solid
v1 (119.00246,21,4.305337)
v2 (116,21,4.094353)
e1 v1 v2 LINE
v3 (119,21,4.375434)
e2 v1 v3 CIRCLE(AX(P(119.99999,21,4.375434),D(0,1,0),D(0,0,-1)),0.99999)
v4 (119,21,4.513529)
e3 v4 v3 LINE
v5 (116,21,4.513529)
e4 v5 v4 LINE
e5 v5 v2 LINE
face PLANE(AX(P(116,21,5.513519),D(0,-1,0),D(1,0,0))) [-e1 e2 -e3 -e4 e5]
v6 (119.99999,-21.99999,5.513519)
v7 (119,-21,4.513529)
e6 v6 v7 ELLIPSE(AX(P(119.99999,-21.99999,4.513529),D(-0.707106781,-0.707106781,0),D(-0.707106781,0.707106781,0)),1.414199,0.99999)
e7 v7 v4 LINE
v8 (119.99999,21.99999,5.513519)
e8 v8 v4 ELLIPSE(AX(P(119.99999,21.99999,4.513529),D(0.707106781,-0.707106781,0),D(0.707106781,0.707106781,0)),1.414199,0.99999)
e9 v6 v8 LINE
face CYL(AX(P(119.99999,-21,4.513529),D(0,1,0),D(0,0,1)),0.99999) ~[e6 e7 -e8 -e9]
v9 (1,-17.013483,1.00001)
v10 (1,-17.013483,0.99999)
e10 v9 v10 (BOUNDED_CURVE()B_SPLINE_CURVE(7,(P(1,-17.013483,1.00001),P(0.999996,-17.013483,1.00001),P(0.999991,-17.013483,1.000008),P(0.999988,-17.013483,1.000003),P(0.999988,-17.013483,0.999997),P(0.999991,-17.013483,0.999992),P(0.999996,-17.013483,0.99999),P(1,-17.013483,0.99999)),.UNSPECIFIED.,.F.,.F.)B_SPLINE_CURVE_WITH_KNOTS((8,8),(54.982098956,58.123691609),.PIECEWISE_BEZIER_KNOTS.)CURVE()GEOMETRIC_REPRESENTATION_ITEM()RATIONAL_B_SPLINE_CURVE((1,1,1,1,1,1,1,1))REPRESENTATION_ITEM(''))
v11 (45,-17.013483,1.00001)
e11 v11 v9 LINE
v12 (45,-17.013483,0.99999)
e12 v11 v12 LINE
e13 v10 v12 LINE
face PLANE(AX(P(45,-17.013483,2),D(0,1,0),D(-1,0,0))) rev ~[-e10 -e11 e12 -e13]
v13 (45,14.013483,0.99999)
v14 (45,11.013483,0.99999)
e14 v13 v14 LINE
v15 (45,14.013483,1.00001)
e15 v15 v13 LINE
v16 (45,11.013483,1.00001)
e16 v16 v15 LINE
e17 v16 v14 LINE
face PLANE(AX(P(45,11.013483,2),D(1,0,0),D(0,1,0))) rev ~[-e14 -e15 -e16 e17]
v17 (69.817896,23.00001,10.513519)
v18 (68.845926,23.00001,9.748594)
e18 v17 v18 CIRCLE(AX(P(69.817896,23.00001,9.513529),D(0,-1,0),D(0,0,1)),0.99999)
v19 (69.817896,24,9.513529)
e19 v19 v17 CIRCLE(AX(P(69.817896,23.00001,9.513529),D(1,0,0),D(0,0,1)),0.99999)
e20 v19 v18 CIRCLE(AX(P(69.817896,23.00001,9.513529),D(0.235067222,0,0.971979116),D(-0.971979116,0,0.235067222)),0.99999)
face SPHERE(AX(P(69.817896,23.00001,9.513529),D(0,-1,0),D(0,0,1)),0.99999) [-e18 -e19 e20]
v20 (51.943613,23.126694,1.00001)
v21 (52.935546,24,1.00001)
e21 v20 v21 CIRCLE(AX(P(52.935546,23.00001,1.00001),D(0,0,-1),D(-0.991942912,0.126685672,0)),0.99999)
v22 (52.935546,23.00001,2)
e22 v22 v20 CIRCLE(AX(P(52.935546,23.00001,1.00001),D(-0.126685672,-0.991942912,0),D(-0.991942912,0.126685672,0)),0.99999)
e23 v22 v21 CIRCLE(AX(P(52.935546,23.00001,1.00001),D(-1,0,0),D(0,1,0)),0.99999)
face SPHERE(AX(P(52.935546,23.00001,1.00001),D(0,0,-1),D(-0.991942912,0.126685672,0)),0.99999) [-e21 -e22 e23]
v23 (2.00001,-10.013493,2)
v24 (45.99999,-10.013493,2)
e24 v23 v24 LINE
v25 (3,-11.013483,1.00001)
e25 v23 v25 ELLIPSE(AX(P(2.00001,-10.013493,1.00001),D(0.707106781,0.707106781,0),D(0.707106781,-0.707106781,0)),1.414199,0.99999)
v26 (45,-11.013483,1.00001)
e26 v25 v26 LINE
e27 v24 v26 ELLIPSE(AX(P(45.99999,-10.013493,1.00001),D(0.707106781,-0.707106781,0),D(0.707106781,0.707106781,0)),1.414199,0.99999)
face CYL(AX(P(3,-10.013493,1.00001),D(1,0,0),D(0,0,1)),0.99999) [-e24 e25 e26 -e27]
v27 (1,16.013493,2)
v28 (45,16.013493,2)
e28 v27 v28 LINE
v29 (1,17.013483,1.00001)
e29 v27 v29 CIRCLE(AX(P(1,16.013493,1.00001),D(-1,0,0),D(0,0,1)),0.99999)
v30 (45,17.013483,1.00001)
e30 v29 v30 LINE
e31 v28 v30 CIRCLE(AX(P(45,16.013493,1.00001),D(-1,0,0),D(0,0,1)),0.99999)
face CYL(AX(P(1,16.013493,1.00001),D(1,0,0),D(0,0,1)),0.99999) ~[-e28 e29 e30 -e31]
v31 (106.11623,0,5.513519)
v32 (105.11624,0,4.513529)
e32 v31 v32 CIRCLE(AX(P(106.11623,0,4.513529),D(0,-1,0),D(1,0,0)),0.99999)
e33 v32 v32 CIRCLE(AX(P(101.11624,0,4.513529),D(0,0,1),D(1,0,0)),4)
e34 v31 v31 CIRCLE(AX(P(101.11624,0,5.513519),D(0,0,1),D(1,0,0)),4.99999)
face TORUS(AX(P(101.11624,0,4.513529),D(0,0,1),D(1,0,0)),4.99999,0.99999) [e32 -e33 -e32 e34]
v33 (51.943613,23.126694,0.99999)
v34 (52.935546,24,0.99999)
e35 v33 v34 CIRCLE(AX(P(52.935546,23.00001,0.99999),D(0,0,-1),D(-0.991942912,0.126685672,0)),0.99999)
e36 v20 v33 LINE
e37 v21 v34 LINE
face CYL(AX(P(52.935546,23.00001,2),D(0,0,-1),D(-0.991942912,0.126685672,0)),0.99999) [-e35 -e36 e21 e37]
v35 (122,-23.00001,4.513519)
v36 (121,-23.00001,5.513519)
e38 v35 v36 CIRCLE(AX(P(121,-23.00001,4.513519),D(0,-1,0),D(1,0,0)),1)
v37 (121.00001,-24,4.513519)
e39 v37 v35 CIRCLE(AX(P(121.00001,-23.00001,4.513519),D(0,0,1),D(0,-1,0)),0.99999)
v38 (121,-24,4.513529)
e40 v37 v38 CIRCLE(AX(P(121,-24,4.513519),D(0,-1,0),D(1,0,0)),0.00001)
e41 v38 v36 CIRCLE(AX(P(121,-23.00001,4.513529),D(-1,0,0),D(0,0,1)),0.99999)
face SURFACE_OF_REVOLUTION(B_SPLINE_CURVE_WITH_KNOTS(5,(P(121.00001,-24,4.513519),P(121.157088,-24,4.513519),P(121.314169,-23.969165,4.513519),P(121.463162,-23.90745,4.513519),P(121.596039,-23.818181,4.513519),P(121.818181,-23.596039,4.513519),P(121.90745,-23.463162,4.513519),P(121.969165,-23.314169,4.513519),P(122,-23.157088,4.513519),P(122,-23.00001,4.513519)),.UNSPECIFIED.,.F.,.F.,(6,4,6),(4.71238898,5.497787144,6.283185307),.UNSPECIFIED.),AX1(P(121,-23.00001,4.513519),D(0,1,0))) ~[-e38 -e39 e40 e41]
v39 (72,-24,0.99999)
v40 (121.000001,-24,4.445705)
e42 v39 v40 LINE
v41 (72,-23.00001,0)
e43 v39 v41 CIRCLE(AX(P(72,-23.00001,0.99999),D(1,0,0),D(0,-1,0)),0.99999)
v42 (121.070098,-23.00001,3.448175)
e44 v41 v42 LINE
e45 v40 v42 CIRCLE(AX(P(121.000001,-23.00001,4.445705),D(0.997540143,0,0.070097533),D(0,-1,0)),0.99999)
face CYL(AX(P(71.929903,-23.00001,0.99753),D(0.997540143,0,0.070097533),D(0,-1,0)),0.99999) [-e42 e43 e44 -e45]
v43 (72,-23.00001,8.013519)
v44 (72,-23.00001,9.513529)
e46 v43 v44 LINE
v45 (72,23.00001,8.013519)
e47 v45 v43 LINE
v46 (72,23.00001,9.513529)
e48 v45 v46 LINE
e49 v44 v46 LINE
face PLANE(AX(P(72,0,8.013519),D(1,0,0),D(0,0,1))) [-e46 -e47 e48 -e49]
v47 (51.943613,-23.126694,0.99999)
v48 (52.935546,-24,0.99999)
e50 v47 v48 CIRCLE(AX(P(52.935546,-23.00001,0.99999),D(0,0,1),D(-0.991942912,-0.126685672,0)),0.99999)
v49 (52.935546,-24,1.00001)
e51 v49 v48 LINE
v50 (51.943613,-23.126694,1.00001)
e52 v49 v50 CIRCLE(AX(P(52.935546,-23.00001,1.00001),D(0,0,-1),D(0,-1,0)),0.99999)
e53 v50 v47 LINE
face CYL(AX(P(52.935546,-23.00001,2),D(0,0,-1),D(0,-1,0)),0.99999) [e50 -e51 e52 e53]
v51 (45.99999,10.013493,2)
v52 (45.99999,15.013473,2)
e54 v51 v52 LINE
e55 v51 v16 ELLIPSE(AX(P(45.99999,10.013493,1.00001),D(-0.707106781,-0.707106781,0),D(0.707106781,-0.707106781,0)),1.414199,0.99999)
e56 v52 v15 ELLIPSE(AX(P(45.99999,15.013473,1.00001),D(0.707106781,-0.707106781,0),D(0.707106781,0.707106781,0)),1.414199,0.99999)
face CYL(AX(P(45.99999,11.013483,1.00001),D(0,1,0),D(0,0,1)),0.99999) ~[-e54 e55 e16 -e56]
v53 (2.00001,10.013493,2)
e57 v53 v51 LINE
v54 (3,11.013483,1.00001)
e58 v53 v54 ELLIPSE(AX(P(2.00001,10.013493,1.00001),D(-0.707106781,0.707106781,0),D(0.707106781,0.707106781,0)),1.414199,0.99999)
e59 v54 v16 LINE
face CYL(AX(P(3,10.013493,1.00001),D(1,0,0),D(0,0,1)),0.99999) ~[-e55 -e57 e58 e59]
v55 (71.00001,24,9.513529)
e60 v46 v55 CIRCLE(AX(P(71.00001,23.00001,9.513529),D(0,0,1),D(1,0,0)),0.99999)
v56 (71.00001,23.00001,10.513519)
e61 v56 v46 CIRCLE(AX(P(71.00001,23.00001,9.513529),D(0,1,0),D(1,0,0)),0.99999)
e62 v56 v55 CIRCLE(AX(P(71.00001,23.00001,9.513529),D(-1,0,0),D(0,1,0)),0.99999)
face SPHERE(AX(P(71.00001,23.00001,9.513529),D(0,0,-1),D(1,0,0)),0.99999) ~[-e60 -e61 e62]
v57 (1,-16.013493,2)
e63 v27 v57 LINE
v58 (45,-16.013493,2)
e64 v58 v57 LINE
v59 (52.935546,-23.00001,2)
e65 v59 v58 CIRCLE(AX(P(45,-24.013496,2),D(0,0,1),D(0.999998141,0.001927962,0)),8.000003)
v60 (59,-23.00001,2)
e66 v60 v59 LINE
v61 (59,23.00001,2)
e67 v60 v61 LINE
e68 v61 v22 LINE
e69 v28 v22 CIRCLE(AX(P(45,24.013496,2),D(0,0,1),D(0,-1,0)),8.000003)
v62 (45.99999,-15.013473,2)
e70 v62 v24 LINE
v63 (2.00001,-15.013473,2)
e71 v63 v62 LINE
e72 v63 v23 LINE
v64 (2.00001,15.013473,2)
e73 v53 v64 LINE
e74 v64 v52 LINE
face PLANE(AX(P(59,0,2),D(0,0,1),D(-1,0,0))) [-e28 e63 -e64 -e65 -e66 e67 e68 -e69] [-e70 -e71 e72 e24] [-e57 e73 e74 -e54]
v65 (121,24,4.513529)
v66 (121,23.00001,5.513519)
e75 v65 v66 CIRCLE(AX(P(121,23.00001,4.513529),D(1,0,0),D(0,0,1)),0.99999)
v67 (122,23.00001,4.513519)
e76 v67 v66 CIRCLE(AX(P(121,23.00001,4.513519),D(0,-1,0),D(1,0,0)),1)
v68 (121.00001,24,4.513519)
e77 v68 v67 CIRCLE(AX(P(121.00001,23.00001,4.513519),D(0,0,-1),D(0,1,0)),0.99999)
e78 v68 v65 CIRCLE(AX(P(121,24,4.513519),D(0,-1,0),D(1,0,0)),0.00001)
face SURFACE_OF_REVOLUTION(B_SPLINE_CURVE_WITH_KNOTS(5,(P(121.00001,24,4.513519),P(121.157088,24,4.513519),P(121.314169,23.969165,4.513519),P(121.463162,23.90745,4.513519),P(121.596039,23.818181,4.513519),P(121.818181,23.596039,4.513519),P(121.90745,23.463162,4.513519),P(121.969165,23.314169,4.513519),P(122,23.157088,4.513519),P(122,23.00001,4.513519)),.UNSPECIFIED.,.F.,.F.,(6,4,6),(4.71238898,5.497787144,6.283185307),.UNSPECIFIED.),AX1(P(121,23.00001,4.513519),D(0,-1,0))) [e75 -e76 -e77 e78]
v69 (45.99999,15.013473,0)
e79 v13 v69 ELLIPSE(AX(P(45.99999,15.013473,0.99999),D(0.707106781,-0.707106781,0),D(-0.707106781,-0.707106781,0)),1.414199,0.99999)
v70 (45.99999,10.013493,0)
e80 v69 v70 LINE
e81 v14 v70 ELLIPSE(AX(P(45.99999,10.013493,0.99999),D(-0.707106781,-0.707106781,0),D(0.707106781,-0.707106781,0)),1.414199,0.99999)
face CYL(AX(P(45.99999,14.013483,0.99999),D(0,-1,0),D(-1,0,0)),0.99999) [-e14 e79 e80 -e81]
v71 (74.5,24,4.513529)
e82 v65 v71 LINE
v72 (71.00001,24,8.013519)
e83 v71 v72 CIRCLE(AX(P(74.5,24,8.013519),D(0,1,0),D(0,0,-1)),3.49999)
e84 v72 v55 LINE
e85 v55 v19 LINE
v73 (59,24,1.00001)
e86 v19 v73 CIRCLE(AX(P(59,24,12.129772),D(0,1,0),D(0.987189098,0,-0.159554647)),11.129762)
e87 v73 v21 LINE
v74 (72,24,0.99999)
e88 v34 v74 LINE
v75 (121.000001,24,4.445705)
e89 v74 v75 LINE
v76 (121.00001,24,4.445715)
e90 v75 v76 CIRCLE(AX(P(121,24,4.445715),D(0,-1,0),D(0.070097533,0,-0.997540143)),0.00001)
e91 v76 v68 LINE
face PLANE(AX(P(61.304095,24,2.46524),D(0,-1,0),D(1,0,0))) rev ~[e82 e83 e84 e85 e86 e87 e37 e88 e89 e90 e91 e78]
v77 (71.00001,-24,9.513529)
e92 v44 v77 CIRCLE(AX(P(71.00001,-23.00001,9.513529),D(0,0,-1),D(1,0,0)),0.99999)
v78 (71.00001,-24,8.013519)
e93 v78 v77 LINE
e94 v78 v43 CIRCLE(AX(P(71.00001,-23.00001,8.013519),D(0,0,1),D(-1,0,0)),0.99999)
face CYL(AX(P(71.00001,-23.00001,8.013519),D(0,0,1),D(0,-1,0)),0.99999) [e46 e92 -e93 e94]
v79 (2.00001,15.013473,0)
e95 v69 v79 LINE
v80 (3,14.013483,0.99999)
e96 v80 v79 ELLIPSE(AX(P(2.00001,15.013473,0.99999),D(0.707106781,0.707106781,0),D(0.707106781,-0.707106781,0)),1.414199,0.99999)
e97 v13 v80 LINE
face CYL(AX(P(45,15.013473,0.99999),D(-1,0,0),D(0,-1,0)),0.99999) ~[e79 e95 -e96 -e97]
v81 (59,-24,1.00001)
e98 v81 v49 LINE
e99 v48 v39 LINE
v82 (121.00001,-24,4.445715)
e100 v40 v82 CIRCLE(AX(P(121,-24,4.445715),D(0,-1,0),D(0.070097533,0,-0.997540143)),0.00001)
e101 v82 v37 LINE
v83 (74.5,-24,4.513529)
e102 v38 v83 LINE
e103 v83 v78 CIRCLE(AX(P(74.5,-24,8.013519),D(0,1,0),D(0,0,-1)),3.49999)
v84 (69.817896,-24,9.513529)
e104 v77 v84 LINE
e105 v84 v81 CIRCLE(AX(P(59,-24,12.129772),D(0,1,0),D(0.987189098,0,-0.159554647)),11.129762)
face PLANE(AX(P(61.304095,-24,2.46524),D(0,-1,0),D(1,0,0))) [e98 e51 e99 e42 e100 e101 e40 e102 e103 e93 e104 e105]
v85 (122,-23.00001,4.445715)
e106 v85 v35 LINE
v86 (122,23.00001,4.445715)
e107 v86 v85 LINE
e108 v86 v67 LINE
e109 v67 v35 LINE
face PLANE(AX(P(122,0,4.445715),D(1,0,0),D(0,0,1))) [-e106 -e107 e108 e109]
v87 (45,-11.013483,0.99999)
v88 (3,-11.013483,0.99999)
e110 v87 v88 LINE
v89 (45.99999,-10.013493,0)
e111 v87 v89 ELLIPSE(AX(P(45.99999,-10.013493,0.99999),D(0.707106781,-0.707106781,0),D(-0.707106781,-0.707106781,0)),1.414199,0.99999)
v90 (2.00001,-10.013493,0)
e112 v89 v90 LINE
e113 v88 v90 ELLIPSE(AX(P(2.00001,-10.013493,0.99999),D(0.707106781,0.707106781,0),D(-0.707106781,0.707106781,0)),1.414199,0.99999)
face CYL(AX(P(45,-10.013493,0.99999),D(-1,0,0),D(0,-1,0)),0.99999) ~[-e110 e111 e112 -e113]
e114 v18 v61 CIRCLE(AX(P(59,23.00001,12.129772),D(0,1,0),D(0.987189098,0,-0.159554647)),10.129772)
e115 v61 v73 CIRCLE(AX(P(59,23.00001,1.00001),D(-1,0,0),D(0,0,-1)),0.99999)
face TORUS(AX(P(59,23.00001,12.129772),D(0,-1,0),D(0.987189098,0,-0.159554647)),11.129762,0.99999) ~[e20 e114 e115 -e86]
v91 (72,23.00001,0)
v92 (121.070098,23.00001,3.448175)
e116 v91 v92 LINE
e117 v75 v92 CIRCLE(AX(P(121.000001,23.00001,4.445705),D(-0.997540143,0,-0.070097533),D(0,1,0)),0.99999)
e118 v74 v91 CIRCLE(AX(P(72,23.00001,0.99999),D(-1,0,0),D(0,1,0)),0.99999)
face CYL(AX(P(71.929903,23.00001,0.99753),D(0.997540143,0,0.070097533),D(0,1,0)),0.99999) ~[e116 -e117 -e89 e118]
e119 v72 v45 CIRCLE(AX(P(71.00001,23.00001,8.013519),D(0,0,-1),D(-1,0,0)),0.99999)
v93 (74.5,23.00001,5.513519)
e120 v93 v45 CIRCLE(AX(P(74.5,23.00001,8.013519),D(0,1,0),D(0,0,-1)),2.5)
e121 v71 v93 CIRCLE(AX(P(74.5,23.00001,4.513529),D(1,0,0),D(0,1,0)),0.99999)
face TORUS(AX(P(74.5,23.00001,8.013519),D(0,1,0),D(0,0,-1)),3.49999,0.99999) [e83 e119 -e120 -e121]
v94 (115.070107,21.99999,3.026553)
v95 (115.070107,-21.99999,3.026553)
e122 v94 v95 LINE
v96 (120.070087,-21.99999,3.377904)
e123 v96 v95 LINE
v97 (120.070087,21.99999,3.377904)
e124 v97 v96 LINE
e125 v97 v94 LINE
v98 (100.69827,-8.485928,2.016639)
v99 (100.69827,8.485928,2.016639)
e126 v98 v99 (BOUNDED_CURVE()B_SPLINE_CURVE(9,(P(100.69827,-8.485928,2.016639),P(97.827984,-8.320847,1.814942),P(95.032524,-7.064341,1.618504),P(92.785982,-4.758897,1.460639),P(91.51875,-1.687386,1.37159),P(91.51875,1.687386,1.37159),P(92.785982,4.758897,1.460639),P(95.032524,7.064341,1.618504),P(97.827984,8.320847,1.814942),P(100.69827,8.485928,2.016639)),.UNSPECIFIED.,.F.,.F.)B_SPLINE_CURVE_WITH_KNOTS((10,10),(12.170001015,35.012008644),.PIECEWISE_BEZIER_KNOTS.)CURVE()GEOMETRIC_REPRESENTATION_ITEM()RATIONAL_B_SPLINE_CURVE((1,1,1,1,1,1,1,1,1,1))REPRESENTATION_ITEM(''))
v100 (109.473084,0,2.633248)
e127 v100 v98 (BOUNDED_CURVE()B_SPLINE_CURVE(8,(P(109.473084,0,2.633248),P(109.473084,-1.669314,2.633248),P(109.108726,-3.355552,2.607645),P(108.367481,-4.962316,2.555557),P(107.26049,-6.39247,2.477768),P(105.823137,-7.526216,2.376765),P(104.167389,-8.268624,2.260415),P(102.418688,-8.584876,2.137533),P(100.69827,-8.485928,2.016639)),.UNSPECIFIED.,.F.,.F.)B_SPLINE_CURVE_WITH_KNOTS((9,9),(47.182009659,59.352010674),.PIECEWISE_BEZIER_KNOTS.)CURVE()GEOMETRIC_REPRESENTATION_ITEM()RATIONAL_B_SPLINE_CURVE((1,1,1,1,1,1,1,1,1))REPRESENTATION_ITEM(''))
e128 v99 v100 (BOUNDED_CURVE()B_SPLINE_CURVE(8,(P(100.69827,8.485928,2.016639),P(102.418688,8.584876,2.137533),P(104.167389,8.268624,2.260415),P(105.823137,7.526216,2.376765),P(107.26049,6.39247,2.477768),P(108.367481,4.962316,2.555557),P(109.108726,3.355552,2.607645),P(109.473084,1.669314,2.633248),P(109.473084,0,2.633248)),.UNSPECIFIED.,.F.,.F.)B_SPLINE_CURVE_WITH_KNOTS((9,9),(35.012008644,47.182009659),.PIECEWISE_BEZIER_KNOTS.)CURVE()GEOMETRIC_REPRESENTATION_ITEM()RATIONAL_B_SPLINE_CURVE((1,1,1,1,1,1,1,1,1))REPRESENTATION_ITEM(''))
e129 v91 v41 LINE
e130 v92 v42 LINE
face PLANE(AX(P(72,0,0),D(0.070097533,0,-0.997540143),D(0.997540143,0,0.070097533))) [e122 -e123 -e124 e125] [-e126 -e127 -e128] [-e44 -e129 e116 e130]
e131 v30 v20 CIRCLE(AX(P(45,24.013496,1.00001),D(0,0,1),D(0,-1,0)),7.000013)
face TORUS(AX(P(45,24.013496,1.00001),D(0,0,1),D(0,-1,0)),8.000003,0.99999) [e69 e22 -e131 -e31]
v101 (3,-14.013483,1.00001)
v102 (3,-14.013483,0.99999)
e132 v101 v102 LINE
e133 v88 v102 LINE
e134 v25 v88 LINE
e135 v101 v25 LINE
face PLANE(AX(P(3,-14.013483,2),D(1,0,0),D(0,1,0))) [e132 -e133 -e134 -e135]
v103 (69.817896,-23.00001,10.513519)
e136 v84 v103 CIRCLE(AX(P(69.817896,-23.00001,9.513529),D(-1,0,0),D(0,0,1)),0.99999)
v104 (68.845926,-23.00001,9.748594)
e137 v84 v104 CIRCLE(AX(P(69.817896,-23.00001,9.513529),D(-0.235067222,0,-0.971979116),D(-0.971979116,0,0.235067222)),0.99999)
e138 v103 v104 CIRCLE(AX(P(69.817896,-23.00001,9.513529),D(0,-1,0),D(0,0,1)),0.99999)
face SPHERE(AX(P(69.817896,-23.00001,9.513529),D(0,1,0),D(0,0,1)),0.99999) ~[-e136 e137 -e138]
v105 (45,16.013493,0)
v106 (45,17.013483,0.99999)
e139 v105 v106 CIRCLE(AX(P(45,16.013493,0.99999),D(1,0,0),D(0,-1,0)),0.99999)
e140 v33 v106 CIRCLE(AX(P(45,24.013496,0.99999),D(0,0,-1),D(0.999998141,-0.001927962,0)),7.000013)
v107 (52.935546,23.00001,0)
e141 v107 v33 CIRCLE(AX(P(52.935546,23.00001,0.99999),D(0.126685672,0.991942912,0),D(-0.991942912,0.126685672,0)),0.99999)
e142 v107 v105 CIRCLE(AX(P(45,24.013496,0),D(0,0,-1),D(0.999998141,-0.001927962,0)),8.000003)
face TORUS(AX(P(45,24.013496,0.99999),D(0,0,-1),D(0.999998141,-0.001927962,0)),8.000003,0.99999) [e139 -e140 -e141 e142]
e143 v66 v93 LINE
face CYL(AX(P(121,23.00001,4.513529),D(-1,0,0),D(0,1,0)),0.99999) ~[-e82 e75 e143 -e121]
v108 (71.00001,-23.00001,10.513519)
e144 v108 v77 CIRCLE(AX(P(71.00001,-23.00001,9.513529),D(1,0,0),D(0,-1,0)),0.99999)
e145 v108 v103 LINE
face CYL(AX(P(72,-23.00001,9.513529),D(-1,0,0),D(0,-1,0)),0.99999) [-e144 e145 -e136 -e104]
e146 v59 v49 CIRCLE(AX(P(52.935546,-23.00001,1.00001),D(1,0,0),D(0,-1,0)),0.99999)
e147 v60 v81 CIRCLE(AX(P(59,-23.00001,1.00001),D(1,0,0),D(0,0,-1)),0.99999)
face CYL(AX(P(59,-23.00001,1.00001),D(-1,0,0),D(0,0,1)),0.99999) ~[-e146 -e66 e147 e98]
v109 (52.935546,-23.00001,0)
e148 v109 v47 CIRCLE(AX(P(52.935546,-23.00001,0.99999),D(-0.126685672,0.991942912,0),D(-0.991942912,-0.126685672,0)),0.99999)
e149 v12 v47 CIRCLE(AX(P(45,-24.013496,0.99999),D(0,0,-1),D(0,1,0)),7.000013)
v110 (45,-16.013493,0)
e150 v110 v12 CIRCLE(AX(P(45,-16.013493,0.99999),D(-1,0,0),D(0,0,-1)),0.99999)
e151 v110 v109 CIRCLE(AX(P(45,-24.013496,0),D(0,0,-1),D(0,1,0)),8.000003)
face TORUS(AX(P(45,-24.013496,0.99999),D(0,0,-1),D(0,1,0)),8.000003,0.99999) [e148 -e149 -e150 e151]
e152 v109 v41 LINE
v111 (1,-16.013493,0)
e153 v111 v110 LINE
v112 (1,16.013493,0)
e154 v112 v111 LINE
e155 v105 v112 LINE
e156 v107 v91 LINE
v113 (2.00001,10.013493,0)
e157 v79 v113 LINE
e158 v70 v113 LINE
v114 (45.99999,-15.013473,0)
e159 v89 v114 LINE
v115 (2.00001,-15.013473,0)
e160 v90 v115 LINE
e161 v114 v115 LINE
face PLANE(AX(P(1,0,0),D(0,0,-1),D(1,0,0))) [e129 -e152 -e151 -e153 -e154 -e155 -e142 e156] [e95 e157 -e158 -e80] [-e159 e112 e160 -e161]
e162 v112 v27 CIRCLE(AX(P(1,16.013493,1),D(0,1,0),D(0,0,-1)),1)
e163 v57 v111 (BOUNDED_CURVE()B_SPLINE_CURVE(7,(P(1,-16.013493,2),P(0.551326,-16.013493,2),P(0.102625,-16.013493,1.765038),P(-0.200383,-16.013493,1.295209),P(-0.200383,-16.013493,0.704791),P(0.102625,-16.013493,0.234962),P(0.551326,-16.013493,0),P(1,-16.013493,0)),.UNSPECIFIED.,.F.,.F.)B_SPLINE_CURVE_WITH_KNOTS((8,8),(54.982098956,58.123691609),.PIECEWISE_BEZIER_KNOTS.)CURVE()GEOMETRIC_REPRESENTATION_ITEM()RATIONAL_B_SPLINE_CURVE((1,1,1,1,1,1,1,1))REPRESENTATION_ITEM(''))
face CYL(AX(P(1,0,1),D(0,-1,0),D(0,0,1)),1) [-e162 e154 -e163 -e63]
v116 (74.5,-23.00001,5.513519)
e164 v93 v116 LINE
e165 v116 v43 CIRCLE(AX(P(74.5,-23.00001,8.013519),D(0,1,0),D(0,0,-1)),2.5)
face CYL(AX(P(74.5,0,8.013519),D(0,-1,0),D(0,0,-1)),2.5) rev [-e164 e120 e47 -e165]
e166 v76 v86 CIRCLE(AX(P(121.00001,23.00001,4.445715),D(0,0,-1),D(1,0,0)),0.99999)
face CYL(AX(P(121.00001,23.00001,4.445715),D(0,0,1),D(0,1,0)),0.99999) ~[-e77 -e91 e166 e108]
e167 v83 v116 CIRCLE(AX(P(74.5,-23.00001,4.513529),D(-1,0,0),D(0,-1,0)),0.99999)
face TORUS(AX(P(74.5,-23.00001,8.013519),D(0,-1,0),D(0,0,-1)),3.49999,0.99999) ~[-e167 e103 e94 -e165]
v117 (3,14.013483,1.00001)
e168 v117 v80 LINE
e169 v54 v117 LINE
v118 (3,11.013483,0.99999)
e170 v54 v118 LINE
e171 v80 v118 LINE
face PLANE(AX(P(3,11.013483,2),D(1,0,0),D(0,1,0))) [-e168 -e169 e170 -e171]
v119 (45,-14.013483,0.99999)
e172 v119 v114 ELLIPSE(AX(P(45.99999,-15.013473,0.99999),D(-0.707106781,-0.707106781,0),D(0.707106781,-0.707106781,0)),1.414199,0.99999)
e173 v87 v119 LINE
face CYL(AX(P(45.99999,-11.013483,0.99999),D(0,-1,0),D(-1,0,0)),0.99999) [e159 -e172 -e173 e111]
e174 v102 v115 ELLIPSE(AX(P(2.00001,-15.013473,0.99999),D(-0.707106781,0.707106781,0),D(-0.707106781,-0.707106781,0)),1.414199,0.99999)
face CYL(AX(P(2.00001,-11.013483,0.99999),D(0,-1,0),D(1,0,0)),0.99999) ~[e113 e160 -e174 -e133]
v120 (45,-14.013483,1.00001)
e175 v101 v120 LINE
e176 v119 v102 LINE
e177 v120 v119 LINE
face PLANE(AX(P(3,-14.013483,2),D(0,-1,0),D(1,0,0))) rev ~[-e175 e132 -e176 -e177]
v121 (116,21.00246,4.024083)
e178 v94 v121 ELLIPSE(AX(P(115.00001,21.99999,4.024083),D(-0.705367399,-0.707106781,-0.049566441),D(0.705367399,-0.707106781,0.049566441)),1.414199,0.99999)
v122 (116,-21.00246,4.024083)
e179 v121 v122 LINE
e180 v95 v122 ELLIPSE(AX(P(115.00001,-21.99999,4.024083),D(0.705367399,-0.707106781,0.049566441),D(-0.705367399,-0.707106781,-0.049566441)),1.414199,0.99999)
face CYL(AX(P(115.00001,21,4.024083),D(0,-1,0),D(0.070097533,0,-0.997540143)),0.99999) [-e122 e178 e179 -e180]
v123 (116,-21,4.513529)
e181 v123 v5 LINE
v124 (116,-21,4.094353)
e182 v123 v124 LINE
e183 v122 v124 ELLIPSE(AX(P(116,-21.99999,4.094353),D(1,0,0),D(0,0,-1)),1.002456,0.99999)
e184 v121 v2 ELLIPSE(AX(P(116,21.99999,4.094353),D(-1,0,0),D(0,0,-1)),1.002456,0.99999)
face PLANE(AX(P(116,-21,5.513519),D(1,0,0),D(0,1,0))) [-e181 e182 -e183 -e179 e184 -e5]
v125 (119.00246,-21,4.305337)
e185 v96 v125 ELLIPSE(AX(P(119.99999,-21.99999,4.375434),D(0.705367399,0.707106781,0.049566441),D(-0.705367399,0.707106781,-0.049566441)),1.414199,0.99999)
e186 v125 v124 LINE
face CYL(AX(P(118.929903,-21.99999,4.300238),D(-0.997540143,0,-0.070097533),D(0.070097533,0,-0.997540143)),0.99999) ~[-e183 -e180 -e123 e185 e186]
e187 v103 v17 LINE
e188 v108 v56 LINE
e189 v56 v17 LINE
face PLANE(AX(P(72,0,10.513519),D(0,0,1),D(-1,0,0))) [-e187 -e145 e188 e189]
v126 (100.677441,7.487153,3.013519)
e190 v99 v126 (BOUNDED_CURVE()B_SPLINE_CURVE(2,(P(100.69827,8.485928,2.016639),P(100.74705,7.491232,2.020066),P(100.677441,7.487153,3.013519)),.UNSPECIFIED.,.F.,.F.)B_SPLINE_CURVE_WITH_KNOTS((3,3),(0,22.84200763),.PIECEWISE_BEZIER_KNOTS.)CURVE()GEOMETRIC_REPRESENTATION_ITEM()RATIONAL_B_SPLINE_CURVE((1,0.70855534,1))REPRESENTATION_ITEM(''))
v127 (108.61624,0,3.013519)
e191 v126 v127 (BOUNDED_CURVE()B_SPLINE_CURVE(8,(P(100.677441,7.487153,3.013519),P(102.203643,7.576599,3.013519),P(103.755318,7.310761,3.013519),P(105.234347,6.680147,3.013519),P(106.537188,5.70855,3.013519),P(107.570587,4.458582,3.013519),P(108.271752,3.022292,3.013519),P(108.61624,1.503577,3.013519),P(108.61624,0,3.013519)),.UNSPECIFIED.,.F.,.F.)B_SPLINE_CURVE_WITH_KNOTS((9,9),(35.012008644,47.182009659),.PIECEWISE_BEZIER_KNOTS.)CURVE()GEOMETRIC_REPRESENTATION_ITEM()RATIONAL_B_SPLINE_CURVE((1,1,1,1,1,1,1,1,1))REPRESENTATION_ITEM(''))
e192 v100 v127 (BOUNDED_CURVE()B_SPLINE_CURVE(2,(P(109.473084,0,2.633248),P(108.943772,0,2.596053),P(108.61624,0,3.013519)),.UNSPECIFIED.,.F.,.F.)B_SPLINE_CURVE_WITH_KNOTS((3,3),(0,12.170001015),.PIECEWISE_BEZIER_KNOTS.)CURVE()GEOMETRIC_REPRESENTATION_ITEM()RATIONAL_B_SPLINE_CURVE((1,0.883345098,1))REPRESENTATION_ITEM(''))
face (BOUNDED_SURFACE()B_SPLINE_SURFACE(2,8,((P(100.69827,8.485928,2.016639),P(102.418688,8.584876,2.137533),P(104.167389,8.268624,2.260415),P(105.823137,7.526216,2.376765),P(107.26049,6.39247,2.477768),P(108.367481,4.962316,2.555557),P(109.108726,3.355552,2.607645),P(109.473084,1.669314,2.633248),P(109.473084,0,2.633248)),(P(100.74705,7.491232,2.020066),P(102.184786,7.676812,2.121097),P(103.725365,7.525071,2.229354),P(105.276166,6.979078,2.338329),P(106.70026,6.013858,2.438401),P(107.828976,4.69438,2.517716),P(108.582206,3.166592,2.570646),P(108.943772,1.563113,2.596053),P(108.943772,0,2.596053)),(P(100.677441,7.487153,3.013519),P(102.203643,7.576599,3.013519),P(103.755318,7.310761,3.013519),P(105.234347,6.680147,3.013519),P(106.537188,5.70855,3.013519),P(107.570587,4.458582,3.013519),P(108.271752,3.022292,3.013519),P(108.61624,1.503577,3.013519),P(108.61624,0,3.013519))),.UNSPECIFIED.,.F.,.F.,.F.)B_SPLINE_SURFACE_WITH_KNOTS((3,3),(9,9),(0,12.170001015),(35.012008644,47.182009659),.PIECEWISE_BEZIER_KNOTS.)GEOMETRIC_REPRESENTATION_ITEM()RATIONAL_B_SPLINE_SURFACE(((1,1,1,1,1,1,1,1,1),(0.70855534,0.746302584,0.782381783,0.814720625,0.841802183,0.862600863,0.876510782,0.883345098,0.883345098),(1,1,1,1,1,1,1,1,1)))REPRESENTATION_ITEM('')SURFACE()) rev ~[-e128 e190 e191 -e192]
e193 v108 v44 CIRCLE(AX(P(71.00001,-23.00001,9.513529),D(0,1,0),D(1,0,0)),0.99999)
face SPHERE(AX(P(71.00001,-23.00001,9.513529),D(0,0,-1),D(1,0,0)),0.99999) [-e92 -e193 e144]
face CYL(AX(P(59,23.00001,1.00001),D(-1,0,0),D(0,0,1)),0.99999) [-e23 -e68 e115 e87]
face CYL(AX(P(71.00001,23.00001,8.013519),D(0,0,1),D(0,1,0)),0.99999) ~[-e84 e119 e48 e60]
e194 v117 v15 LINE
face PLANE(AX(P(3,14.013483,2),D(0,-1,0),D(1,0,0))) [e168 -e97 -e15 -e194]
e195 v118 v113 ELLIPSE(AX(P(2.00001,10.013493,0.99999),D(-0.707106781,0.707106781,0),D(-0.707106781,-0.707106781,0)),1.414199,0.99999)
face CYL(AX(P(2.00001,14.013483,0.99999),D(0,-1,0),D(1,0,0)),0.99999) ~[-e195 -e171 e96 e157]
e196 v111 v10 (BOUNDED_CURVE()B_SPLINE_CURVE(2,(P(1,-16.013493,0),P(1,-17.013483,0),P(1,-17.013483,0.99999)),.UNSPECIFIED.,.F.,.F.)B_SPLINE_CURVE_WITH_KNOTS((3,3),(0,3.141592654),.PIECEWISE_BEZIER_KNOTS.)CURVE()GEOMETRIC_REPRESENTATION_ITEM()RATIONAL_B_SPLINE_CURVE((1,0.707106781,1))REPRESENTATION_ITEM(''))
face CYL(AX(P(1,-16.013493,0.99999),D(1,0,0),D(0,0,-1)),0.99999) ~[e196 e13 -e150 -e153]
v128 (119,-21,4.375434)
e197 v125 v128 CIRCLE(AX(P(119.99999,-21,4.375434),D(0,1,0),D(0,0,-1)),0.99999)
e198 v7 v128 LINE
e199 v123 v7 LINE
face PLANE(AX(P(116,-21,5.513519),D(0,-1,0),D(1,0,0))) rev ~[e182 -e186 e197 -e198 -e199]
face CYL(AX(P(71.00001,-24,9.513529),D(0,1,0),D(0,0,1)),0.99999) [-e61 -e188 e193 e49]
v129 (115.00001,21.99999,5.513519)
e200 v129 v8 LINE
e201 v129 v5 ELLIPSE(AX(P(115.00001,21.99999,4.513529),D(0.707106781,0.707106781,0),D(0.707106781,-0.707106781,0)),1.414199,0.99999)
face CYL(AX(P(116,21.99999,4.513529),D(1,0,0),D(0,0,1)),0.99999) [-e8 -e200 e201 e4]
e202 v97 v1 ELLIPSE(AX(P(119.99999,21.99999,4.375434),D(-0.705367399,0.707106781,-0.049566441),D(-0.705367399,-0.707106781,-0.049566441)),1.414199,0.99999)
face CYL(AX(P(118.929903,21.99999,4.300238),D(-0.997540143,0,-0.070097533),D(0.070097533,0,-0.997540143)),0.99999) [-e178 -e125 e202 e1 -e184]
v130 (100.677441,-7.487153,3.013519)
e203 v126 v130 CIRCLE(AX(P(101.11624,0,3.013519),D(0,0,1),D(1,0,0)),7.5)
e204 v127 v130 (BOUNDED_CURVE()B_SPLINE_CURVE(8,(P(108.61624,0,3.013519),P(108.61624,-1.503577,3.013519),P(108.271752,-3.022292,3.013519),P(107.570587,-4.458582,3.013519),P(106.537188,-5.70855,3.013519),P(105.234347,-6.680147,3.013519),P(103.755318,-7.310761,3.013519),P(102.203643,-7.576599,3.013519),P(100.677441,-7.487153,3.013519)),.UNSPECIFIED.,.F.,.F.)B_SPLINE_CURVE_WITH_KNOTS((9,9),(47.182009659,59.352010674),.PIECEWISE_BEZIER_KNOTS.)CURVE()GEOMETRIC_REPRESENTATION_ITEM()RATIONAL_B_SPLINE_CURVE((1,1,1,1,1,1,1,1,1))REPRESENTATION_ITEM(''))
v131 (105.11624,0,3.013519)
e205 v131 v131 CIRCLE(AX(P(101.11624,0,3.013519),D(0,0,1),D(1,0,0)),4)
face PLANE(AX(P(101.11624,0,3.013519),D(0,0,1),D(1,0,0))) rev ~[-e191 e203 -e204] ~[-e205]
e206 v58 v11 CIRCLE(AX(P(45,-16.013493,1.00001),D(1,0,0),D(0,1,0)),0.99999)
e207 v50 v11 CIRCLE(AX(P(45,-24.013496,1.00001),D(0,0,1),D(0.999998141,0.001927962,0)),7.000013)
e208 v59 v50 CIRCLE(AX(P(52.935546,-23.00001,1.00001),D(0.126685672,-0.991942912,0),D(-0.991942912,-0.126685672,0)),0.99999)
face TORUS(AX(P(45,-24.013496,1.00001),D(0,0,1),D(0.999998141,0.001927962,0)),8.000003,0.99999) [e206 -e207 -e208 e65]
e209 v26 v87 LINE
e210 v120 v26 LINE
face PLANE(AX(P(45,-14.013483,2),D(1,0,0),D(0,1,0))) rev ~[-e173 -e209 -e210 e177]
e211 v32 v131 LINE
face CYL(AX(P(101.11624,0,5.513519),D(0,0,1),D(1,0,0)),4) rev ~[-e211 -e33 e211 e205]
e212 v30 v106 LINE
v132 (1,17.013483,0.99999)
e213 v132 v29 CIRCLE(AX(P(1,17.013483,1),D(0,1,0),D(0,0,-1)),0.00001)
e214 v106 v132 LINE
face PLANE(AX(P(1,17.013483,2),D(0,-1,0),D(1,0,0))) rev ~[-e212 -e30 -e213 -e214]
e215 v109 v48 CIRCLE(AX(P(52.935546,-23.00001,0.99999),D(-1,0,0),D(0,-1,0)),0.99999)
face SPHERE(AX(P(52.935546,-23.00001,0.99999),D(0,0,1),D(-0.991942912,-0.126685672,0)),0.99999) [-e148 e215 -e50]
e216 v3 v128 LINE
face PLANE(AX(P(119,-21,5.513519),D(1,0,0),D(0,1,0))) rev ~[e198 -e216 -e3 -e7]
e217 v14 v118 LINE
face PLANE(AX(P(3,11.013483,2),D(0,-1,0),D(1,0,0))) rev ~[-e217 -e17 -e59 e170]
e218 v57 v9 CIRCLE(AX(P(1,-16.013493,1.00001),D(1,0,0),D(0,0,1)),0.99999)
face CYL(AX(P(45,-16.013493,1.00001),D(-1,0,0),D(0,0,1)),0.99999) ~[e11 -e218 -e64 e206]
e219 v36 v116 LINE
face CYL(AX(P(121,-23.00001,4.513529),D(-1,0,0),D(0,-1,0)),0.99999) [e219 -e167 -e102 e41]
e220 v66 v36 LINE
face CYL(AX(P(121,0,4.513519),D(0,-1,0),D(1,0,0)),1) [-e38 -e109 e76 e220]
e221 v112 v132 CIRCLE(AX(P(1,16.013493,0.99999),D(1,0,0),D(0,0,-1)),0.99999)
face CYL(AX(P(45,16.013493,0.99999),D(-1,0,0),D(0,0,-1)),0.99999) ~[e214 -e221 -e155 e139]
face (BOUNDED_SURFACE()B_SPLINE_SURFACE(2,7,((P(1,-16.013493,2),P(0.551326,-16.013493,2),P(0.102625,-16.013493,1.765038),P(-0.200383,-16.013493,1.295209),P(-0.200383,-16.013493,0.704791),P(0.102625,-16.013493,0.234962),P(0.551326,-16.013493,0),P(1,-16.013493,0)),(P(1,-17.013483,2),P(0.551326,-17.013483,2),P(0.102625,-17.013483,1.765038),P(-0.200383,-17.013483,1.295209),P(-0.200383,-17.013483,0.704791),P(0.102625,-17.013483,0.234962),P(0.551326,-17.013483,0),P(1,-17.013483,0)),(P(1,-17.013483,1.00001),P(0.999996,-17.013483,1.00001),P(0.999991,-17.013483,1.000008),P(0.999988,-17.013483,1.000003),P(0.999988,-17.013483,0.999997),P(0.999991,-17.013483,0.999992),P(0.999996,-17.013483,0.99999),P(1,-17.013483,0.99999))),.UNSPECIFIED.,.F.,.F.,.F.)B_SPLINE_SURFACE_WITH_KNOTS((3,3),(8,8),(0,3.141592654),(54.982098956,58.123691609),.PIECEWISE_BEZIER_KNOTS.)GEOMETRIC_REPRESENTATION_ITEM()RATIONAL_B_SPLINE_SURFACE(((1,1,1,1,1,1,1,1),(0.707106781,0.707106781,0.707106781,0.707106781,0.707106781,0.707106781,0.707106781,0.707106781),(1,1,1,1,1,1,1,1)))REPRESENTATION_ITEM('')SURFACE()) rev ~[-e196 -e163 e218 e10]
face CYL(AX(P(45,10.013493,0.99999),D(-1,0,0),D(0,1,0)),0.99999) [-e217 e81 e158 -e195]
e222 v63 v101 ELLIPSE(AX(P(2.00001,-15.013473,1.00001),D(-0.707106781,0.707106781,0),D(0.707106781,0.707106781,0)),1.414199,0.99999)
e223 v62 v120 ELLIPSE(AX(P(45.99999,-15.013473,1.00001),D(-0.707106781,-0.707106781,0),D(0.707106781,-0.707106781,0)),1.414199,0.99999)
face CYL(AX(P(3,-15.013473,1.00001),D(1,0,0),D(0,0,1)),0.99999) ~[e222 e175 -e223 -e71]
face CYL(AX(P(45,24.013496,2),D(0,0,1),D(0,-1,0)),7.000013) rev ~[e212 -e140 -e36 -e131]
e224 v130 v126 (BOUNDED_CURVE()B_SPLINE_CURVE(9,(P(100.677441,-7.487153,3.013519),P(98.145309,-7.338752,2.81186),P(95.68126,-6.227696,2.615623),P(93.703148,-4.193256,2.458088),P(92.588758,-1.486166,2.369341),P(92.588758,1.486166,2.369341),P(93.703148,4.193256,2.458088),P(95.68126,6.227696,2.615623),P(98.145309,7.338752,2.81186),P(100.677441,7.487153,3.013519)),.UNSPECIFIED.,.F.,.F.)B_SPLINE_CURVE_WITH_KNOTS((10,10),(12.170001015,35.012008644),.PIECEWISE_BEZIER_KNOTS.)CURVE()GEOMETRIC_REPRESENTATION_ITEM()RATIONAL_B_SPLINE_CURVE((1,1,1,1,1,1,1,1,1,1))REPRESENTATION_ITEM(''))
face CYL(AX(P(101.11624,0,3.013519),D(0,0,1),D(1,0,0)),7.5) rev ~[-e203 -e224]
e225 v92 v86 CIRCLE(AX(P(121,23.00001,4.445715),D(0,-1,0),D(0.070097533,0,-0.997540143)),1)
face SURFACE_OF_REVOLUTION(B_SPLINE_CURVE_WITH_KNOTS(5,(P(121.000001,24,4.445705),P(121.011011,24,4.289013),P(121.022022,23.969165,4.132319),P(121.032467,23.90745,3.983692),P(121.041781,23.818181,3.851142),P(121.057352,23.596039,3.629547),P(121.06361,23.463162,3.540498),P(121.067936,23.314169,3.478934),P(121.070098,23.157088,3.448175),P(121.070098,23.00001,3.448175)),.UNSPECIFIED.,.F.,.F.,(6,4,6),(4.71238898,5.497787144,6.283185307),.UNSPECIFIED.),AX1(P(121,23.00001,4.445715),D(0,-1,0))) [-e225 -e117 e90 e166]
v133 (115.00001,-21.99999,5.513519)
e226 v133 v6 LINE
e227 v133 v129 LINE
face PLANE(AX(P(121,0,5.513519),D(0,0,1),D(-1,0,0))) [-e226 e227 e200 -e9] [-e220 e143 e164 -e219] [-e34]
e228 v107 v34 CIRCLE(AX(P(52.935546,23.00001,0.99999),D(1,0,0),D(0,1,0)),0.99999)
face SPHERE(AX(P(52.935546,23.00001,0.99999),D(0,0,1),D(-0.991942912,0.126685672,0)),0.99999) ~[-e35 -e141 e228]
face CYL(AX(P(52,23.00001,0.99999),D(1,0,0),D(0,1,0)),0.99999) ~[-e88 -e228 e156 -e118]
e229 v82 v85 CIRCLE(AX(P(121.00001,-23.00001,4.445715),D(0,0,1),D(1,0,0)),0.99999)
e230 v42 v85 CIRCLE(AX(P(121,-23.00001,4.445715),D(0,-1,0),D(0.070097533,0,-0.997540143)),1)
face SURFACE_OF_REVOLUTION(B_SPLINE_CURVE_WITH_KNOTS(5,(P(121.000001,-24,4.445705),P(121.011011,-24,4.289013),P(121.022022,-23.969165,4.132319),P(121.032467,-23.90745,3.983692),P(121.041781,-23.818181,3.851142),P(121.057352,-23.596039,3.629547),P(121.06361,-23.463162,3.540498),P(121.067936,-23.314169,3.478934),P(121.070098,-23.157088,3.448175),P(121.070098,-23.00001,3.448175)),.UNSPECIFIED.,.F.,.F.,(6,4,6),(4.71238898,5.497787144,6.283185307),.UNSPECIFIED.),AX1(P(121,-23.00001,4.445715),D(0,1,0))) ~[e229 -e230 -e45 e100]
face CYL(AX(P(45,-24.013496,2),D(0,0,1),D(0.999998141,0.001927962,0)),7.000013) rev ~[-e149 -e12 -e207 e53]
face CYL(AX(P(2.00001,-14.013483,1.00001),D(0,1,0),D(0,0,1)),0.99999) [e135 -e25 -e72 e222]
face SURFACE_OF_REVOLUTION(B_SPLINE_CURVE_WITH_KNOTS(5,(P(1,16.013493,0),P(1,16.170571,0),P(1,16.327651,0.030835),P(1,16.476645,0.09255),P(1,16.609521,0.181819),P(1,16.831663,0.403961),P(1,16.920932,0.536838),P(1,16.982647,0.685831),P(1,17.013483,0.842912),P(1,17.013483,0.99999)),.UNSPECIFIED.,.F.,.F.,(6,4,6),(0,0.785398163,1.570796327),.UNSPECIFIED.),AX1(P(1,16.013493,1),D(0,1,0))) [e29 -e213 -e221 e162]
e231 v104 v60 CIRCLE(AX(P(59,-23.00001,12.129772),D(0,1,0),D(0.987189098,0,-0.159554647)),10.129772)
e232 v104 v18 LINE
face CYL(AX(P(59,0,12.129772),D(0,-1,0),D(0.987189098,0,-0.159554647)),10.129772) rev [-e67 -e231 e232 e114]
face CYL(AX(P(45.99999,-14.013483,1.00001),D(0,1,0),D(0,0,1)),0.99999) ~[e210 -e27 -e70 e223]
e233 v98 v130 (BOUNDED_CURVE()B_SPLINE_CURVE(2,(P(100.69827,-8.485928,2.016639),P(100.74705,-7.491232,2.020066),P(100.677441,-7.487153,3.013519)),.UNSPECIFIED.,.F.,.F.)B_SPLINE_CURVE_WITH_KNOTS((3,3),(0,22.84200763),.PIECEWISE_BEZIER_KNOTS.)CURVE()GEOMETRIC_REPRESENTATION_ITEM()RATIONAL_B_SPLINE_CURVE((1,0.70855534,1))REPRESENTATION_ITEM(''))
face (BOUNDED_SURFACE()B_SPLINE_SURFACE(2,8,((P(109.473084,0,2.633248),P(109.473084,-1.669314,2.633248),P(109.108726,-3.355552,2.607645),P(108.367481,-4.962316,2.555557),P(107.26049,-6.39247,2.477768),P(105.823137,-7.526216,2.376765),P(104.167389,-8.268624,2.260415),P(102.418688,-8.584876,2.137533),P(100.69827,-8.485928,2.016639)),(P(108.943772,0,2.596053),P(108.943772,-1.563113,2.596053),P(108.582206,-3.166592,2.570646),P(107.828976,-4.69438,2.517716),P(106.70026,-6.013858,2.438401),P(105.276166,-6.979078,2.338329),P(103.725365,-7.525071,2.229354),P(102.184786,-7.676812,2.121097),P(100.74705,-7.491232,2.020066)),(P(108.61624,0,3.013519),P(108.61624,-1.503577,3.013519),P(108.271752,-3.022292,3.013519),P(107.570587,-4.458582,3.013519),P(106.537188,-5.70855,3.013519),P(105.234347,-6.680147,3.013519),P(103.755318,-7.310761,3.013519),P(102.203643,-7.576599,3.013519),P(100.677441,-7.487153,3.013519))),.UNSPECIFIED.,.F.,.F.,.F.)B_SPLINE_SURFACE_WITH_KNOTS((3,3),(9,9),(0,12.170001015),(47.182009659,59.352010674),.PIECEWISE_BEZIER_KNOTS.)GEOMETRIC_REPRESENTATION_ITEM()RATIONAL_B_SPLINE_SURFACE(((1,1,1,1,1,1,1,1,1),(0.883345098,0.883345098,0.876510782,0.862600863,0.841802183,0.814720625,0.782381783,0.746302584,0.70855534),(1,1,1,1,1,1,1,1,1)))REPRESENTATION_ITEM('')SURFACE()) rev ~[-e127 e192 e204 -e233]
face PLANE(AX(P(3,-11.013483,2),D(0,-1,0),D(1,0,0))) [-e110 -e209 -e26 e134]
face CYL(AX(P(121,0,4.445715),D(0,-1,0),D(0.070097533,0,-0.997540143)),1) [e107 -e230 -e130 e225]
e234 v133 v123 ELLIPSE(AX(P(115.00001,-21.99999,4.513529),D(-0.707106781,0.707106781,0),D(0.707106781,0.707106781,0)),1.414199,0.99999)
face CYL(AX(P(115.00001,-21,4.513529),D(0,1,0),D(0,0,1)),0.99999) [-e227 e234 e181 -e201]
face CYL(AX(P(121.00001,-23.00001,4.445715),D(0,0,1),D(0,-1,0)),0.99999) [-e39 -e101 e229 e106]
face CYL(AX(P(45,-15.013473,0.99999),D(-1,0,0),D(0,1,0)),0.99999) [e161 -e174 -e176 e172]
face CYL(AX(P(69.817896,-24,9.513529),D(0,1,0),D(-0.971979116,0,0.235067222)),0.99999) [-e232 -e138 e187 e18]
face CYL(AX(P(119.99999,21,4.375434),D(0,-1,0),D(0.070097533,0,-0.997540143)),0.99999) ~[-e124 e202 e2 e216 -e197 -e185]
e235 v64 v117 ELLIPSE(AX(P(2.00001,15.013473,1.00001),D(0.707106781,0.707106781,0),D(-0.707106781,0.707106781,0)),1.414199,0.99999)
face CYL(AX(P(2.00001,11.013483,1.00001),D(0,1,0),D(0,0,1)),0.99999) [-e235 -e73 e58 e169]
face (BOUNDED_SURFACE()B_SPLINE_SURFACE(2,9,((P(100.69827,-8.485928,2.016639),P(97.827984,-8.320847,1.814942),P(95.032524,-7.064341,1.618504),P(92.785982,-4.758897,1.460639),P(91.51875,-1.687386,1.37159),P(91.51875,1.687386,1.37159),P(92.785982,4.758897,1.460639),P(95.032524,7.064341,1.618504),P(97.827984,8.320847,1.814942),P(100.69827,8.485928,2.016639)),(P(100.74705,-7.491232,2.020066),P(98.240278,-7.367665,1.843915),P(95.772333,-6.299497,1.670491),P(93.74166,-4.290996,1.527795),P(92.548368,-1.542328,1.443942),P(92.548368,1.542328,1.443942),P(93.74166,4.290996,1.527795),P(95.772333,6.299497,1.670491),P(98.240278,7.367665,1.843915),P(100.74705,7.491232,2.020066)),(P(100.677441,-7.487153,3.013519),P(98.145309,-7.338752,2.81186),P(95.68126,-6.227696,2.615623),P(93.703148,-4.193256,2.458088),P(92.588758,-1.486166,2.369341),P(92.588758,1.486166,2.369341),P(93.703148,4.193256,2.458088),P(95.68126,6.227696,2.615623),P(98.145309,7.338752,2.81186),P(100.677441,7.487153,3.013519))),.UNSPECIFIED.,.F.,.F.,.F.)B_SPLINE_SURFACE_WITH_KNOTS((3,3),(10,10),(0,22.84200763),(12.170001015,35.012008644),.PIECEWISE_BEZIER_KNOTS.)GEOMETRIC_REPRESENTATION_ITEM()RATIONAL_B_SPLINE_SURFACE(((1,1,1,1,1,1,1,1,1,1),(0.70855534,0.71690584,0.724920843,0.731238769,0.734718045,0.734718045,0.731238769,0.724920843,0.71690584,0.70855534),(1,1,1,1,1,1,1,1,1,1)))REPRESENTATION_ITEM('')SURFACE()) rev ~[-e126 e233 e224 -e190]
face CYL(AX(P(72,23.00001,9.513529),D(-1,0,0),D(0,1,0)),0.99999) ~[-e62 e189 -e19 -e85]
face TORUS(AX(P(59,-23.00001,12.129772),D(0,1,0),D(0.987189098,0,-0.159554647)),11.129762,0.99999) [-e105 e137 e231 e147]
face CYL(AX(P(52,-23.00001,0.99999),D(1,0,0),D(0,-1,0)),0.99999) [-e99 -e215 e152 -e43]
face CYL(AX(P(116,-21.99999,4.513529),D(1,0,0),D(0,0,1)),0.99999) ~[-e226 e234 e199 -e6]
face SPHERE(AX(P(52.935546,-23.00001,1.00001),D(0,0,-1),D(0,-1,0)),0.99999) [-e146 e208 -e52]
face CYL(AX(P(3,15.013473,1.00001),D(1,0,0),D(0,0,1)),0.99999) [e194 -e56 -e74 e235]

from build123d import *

# Parameters (mm, degrees)
F1_DEPTH = 24
F2_W     = 42
F2_H     = 3
F2_W_2   = 1
F2_H_2   = 6.9865172505
F3_DEPTH = 25
F4_W     = 3
F4_H     = 42
F5_DEPTH = 25
F4_R     = 4
F6_DEPTH = 25
F7_START = -2.5
F4_R_2   = 7.5
F7_DEPTH = 47.5
F8_R     = 0.99999


# Not quite as in the source:
# - a fillet or chamfer is up to 0.001 mm smaller than in the source, because OpenCascade refuses the exact size


with BuildPart() as f1:
    # F0 (on Front) → F1 (new body, symmetric)
    with BuildSketch(Plane.XZ):
        with BuildLine():
            Line((59, 2), (1, 2))
            ThreePointArc((1, 2), (0.2928932188, 1.7071067812), (0, 1))
            ThreePointArc((0, 1), (0.2928932188, 0.2928932188), (1, 0))
            Line((1, 0), (72, 0))
            Line((72, 0), (121.0700975327, 3.4481747867))
            ThreePointArc((121.0700975327, 3.4481747867), (121.7314702772, 3.7638416025), (122, 4.4457149292))
            Line((122, 4.4457149292), (122, 4.5135193938))
            ThreePointArc((122, 4.5135193938), (121.7071067812, 5.220626175), (121, 5.5135193938))
            Line((121, 5.5135193938), (74.5, 5.5135193938))
            ThreePointArc((74.5, 5.5135193938), (72.732233047, 6.2457524408), (72, 8.0135193938))
            Line((72, 8.0135193938), (72, 10.5135193938))
            Line((72, 10.5135193938), (69, 10.5135193938))
            ThreePointArc((69, 10.5135193938), (65.5665823011, 4.4166484237), (59, 2))
        make_face()
    extrude(amount=F1_DEPTH, both=True)

    # F2 (on face) → F3 (cut)
    with BuildSketch(Plane.XY.offset(2)):
        with BuildLine():
            Line((1, 24), (1, 17.0134827495))
            Line((1, 17.0134827495), (45, 17.0134827495))
            ThreePointArc((45, 17.0134827495), (49.9449828941, 19.0589699178), (52, 24))
            Line((52, 24), (1, 24))
        make_face()
        with BuildLine():
            Line((45, -17.0134827495), (1, -17.0134827495))
            Line((1, -17.0134827495), (1, -24))
            Line((1, -24), (52, -24))
            ThreePointArc((52, -24), (49.9449828941, -19.0589699178), (45, -17.0134827495))
        make_face()
        with Locations((24, -12.5134827495)):
            Rectangle(F2_W, F2_H)
        with Locations((24, 12.5134827495)):
            Rectangle(F2_W, F2_H)
        with Locations((0.5, 20.5067413747)):
            Rectangle(F2_W_2, F2_H_2)
        with Locations((0.5, -20.5067413747)):
            Rectangle(F2_W_2, F2_H_2)
    extrude(amount=-F3_DEPTH, mode=Mode.SUBTRACT)

    # F4 (on face) → F5 (cut)
    with BuildSketch(Plane.XY.offset(5.5135193938)):
        with Locations((117.5, 0)):
            Rectangle(F4_W, F4_H)
    extrude(amount=-F5_DEPTH, mode=Mode.SUBTRACT)

    # F4 (on face) → F6 (cut)
    with BuildSketch(Plane.XY.offset(5.5135193938)):
        with Locations((101.1162400246, 0)):
            Circle(F4_R)
    extrude(amount=-F6_DEPTH, mode=Mode.SUBTRACT)

    # F4 (on face) → F7 (cut)
    with BuildSketch(Plane.XY.offset(5.5135193938).offset(F7_START)):
        with Locations((101.1162400246, 0)):
            Circle(F4_R_2)
        with Locations((101.1162400246, 0)):
            Circle(F4_R, mode=Mode.SUBTRACT)
    extrude(amount=-F7_DEPTH, mode=Mode.SUBTRACT)

    # F8 (radius 1 in the source; OpenCascade refuses exactly that, so slightly less here)
    f8_edges = [f1.edges().sort_by_distance(p)[0] for p in [
        (59, 0, 2),
        (55.5, -24, 2),
        (49.944983, -19.05897, 2),
        (23, -17.013483, 2),
        (1, 0, 2),
        (23, 17.013483, 2),
        (49.944983, 19.05897, 2),
        (55.5, 24, 2),
        (3, 12.513483, 2),
        (24, 11.013483, 2),
        (45, 12.513483, 2),
        (24, 14.013483, 2),
        (24, -11.013483, 2),
        (3, -12.513483, 2),
        (24, -14.013483, 2),
        (45, -12.513483, 2),
        (1, 0, 0),
        (23, -17.013483, 0),
        (49.944983, -19.05897, 0),
        (62, -24, 0),
        (72, 0, 0),
        (62, 24, 0),
        (49.944983, 19.05897, 0),
        (23, 17.013483, 0),
        (3, 12.513483, 0),
        (24, 14.013483, 0),
        (45, 12.513483, 0),
        (24, 11.013483, 0),
        (24, -11.013483, 0),
        (45, -12.513483, 0),
        (24, -14.013483, 0),
        (3, -12.513483, 0),
        (121, 0, 5.513519),
        (97.75, 24, 5.513519),
        (97.75, -24, 5.513519),
        (74.5, 0, 5.513519),
        (119, 0, 5.513519),
        (117.5, -21, 5.513519),
        (117.5, 21, 5.513519),
        (116, 0, 5.513519),
        (97.11624, 0, 5.513519),
        (72, 0, 10.513519),
        (69, 0, 10.513519),
        (96.535049, 24, 1.724087),
        (96.535049, -24, 1.724087),
        (121.070098, 0, 3.448175),
        (93.61624, 0, 1.518982),
        (119, 0, 3.302708),
        (117.5, 21, 3.197303),
        (117.5, -21, 3.197303),
        (116, 0, 3.091897),
        (70.5, -24, 10.513519),
        (70.5, 24, 10.513519),
        (52, -24, 1),
        (52, 24, 1),
    ]]
    fillet(f8_edges, radius=F8_R)


solid = f1.part
